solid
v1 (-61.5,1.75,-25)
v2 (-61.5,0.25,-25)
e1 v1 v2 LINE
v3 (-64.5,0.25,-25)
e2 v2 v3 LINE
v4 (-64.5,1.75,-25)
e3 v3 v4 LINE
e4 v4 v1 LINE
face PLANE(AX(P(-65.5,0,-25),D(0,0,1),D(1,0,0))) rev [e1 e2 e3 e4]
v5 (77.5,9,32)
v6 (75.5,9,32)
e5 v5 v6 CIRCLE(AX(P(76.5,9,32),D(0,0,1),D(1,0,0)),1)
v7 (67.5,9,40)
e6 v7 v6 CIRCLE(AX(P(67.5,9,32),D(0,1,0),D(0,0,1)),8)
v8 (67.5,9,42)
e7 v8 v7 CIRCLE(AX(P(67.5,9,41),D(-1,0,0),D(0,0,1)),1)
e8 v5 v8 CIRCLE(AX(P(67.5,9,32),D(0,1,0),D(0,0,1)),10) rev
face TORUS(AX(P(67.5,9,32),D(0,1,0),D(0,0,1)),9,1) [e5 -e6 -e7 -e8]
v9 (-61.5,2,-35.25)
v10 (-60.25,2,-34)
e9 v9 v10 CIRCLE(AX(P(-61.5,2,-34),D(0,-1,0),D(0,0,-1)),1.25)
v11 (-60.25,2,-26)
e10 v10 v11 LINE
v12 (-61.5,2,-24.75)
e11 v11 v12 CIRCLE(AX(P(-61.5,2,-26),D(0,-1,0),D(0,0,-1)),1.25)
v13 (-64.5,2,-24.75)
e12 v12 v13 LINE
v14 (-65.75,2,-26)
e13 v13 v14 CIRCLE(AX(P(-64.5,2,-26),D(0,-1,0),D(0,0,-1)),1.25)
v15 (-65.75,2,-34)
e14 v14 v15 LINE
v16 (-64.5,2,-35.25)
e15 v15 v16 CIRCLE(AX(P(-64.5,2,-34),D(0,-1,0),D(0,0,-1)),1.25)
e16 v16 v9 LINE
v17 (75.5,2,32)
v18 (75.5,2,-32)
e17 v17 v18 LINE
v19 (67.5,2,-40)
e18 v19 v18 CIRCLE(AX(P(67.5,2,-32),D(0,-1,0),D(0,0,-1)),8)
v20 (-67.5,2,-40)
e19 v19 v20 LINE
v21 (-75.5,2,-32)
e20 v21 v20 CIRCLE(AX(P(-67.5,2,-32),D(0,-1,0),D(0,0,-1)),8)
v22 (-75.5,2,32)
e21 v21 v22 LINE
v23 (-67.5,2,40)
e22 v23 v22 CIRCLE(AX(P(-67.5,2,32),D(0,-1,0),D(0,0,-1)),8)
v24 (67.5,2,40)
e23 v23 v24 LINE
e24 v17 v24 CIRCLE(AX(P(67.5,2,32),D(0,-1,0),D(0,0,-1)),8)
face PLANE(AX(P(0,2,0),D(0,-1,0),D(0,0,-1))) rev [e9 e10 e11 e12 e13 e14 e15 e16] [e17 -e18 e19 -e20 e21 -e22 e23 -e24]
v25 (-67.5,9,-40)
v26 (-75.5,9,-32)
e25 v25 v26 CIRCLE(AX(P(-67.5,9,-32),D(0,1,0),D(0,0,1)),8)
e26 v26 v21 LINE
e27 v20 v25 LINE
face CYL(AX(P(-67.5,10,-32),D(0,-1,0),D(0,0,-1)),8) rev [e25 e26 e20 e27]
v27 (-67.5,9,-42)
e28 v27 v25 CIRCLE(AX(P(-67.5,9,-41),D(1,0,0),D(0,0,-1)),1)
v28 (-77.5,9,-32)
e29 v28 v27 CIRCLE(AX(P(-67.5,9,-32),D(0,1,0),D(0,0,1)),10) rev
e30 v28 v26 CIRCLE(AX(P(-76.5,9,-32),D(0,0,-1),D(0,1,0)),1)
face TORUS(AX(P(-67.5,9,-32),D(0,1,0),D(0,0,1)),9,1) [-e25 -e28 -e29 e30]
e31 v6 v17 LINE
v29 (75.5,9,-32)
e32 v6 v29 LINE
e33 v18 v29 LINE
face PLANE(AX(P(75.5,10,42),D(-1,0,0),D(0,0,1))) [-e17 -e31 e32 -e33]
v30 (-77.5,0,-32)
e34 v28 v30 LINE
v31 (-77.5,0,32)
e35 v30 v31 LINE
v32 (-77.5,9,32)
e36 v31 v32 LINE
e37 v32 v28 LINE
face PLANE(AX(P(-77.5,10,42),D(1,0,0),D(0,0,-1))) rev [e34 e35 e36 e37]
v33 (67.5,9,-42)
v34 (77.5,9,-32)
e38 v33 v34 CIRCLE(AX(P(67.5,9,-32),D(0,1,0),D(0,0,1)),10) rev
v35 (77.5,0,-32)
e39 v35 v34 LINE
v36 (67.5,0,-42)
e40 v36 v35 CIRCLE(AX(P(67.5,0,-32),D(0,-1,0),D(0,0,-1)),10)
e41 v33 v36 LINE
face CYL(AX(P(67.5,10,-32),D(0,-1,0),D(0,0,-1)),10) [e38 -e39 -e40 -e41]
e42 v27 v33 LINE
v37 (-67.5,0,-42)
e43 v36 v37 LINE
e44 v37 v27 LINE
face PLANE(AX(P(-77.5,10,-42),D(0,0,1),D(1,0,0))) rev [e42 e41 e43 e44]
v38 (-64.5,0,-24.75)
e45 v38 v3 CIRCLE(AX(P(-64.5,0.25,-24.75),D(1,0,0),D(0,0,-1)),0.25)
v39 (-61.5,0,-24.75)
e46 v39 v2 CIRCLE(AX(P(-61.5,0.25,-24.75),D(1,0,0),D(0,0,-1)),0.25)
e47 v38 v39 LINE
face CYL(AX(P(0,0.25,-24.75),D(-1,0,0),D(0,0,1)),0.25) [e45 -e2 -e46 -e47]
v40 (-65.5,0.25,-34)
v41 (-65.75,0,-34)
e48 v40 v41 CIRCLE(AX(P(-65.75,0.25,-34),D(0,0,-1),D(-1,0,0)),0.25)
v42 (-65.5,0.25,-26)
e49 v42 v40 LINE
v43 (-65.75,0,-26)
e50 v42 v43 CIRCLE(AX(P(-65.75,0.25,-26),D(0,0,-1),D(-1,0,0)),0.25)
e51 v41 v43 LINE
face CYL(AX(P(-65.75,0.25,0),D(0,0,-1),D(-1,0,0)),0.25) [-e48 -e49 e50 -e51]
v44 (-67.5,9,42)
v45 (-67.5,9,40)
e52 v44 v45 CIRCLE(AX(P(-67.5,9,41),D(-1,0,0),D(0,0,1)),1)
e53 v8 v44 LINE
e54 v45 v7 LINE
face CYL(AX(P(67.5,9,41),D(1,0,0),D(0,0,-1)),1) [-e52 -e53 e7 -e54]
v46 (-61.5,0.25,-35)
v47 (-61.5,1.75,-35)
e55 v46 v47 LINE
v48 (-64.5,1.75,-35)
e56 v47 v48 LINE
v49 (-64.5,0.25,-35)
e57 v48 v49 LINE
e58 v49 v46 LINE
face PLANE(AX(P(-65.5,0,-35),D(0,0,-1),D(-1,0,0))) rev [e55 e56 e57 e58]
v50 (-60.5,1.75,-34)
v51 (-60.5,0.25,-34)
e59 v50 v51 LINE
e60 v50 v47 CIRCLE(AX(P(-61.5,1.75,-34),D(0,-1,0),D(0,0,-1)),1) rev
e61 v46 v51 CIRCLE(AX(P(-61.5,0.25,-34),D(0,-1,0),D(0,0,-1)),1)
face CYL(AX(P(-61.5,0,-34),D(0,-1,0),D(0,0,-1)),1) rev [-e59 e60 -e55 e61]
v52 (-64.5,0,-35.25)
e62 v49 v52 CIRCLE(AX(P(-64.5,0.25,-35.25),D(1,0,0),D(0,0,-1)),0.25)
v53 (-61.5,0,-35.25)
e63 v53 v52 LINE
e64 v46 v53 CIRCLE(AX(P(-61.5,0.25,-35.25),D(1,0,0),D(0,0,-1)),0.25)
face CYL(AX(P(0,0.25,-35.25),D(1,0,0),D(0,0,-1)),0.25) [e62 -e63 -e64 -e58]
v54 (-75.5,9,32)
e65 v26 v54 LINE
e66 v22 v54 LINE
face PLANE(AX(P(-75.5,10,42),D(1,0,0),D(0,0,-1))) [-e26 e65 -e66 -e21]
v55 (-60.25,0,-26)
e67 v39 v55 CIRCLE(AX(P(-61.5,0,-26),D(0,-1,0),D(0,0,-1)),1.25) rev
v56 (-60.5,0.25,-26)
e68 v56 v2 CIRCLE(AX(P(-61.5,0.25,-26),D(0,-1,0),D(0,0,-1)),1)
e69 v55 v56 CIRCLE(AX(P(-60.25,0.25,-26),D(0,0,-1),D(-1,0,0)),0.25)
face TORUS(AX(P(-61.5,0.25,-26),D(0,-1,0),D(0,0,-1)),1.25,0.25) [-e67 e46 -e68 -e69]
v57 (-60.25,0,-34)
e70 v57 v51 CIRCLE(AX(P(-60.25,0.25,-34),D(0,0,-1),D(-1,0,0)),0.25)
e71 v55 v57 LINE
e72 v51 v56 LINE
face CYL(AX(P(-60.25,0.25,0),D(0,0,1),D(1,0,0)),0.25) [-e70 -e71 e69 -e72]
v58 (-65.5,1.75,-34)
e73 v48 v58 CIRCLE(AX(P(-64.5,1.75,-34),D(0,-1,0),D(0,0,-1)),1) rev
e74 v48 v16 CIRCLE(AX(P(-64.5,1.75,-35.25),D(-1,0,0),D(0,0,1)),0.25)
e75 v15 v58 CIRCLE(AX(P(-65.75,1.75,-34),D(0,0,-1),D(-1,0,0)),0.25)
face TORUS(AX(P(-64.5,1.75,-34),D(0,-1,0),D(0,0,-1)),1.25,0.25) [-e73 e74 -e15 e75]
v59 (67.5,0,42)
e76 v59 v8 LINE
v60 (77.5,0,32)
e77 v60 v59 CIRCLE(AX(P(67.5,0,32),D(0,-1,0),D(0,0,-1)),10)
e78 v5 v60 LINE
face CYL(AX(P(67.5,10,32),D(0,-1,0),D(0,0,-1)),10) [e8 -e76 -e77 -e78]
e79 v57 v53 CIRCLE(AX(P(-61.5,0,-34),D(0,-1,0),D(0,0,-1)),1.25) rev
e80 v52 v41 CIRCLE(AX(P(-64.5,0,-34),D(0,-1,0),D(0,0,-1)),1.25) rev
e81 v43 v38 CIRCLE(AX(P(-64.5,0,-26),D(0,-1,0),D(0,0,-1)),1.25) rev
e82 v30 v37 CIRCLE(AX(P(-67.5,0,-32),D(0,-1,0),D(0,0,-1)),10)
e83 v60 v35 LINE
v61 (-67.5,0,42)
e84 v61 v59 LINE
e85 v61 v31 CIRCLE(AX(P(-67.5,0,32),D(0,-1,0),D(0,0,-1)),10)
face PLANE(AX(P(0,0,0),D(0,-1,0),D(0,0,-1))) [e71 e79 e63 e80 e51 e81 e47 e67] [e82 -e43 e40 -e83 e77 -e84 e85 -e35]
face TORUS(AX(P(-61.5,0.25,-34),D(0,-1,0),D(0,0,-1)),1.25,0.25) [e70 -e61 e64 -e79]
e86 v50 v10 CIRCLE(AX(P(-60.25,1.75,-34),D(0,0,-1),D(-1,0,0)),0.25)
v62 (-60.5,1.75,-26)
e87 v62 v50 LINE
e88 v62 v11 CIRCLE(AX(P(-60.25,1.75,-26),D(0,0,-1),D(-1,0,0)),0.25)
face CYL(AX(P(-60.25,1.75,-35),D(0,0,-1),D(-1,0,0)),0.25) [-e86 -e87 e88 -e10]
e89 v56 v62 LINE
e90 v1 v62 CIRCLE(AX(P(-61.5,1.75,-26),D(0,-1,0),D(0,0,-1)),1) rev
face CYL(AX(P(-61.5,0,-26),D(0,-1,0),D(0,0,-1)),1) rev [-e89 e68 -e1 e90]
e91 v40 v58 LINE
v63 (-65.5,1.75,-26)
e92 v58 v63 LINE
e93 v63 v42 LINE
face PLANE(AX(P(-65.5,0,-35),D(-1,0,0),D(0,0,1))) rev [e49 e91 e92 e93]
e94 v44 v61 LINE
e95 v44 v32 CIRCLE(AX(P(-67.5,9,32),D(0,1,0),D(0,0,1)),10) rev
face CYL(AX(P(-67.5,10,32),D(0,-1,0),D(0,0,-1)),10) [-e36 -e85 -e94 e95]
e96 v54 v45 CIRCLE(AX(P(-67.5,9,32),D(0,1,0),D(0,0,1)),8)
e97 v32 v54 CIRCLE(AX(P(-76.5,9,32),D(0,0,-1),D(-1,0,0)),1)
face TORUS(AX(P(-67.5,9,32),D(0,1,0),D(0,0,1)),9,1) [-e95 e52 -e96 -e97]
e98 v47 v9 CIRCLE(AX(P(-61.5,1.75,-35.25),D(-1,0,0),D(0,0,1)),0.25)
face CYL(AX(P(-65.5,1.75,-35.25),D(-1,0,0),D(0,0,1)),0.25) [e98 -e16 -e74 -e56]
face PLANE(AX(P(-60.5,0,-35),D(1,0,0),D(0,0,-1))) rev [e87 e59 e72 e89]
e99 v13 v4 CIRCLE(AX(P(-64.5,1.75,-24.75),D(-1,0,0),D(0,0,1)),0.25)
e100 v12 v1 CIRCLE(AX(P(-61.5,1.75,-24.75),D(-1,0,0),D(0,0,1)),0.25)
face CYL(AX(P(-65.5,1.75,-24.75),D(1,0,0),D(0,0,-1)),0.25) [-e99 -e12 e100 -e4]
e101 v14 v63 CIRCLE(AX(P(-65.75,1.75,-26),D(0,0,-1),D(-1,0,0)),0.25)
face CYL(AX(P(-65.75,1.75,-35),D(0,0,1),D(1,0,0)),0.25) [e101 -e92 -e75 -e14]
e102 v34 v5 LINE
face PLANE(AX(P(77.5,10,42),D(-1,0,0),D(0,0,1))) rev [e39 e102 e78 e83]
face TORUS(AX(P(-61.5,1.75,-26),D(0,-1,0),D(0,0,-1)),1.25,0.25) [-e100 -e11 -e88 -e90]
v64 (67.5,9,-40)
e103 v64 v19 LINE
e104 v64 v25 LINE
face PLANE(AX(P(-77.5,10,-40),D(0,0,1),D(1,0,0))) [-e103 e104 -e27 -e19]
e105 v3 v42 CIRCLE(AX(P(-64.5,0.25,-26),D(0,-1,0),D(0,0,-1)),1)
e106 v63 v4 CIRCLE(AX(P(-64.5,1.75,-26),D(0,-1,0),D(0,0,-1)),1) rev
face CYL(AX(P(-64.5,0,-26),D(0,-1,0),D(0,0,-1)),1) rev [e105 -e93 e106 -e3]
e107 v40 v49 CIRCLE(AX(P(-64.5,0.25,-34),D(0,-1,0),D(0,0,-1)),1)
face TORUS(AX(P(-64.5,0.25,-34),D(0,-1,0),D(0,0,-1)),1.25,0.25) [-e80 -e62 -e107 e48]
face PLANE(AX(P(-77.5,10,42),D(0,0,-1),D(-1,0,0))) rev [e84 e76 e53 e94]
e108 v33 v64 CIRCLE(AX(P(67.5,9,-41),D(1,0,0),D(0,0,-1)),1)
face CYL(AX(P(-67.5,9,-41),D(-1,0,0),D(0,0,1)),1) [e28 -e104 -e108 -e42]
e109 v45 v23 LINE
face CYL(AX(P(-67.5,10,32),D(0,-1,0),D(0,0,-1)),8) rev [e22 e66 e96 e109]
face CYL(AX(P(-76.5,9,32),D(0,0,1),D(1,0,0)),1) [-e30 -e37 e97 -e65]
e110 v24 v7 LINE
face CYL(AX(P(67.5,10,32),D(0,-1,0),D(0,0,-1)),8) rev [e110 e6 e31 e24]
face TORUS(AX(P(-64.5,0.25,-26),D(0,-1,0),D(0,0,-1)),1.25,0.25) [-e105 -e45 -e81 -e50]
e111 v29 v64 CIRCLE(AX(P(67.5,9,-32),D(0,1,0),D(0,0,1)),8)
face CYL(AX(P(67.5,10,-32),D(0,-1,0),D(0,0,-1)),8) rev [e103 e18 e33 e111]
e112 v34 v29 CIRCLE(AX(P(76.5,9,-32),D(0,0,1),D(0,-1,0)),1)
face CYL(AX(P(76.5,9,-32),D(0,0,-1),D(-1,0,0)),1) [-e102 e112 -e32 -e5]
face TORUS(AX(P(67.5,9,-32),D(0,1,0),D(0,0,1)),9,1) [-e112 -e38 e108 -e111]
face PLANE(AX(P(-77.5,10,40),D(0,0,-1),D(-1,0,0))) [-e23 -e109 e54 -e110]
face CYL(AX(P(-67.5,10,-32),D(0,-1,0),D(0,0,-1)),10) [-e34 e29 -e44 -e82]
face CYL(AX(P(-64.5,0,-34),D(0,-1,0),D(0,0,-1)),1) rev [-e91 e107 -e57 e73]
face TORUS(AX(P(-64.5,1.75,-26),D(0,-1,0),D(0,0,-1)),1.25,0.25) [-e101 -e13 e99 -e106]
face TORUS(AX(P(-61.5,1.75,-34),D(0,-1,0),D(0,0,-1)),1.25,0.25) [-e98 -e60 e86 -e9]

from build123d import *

# Parameters (mm, degrees)
SKETCH1_W           = 155
SKETCH1_H           = 84
BOSS_EXTRUDE1_DEPTH = 10
FILLET1_R           = 10
SHELL1_T            = -2
SKETCH2_W           = 5
SKETCH2_H           = 10
CUT_EXTRUDE1_DEPTH  = 89.511298714
FILLET2_R           = 1
FILLET3_R           = 0.25
FILLET4_R           = 1


with BuildPart() as part:
    # Sketch1 → Boss-Extrude1 (new body)
    with BuildSketch(Plane(origin=(0, 0, 0), x_dir=(1, 0, 0), z_dir=(0, 1, 0))):
        Rectangle(SKETCH1_W, SKETCH1_H)
    extrude(amount=BOSS_EXTRUDE1_DEPTH)

    # Fillet1
    fillet1_edges = [part.edges().sort_by_distance(p)[0] for p in [
        (77.5, 5, 42),
        (-77.5, 5, 42),
        (-77.5, 5, -42),
        (77.5, 5, -42),
    ]]
    fillet(fillet1_edges, radius=FILLET1_R)

    # Shell1
    shell1_openings = [part.faces().sort_by_distance(p)[0] for p in [
        (0, 10, 0),
    ]]
    offset(amount=SHELL1_T, openings=shell1_openings, kind=Kind.INTERSECTION)

    # Sketch2 → Cut-Extrude1 (cut, through all)
    with BuildSketch(Plane(origin=(0, 2, 0), x_dir=(1, 0, 0), z_dir=(0, 1, 0))):
        with Locations((-63, 30)):
            Rectangle(SKETCH2_W, SKETCH2_H)
    extrude(amount=-CUT_EXTRUDE1_DEPTH, mode=Mode.SUBTRACT)

    # Fillet2
    fillet2_edges = [part.edges().sort_by_distance(p)[0] for p in [
        (-60.5, 1, -35),
        (-60.5, 1, -25),
        (-65.5, 1, -25),
        (-65.5, 1, -35),
    ]]
    fillet(fillet2_edges, radius=FILLET2_R)

    # Fillet3
    fillet3_edges = [part.edges().sort_by_distance(p)[0] for p in [
        (-60.5, 2, -30),
        (-60.5, 0, -30),
        (-63, 2, -25),
        (-63, 0, -25),
        (-65.5, 2, -30),
        (-65.5, 0, -30),
        (-63, 2, -35),
        (-63, 0, -35),
        (-60.792893219, 2, -25.292893219),
        (-60.792893219, 0, -25.292893219),
        (-65.207106781, 2, -25.292893219),
        (-65.207106781, 0, -25.292893219),
        (-65.207106781, 2, -34.707106781),
        (-65.207106781, 0, -34.707106781),
        (-60.792893219, 2, -34.707106781),
        (-60.792893219, 0, -34.707106781),
    ]]
    fillet(fillet3_edges, radius=FILLET3_R)

    # Fillet4
    fillet4_edges = [part.edges().sort_by_distance(p)[0] for p in [
        (0, 10, 42),
        (-77.5, 10, 0),
        (77.5, 10, 0),
        (0, 10, -42),
        (74.571067812, 10, 39.071067812),
        (74.571067812, 10, -39.071067812),
        (-74.571067812, 10, -39.071067812),
        (-74.571067812, 10, 39.071067812),
        (-75.5, 10, 0),
        (0, 10, 40),
        (75.5, 10, 0),
        (0, 10, -40),
    ]]
    fillet(fillet4_edges, radius=FILLET4_R - 0.0001)  # a hair under: the kernel refuses the full size


solid = part.part
